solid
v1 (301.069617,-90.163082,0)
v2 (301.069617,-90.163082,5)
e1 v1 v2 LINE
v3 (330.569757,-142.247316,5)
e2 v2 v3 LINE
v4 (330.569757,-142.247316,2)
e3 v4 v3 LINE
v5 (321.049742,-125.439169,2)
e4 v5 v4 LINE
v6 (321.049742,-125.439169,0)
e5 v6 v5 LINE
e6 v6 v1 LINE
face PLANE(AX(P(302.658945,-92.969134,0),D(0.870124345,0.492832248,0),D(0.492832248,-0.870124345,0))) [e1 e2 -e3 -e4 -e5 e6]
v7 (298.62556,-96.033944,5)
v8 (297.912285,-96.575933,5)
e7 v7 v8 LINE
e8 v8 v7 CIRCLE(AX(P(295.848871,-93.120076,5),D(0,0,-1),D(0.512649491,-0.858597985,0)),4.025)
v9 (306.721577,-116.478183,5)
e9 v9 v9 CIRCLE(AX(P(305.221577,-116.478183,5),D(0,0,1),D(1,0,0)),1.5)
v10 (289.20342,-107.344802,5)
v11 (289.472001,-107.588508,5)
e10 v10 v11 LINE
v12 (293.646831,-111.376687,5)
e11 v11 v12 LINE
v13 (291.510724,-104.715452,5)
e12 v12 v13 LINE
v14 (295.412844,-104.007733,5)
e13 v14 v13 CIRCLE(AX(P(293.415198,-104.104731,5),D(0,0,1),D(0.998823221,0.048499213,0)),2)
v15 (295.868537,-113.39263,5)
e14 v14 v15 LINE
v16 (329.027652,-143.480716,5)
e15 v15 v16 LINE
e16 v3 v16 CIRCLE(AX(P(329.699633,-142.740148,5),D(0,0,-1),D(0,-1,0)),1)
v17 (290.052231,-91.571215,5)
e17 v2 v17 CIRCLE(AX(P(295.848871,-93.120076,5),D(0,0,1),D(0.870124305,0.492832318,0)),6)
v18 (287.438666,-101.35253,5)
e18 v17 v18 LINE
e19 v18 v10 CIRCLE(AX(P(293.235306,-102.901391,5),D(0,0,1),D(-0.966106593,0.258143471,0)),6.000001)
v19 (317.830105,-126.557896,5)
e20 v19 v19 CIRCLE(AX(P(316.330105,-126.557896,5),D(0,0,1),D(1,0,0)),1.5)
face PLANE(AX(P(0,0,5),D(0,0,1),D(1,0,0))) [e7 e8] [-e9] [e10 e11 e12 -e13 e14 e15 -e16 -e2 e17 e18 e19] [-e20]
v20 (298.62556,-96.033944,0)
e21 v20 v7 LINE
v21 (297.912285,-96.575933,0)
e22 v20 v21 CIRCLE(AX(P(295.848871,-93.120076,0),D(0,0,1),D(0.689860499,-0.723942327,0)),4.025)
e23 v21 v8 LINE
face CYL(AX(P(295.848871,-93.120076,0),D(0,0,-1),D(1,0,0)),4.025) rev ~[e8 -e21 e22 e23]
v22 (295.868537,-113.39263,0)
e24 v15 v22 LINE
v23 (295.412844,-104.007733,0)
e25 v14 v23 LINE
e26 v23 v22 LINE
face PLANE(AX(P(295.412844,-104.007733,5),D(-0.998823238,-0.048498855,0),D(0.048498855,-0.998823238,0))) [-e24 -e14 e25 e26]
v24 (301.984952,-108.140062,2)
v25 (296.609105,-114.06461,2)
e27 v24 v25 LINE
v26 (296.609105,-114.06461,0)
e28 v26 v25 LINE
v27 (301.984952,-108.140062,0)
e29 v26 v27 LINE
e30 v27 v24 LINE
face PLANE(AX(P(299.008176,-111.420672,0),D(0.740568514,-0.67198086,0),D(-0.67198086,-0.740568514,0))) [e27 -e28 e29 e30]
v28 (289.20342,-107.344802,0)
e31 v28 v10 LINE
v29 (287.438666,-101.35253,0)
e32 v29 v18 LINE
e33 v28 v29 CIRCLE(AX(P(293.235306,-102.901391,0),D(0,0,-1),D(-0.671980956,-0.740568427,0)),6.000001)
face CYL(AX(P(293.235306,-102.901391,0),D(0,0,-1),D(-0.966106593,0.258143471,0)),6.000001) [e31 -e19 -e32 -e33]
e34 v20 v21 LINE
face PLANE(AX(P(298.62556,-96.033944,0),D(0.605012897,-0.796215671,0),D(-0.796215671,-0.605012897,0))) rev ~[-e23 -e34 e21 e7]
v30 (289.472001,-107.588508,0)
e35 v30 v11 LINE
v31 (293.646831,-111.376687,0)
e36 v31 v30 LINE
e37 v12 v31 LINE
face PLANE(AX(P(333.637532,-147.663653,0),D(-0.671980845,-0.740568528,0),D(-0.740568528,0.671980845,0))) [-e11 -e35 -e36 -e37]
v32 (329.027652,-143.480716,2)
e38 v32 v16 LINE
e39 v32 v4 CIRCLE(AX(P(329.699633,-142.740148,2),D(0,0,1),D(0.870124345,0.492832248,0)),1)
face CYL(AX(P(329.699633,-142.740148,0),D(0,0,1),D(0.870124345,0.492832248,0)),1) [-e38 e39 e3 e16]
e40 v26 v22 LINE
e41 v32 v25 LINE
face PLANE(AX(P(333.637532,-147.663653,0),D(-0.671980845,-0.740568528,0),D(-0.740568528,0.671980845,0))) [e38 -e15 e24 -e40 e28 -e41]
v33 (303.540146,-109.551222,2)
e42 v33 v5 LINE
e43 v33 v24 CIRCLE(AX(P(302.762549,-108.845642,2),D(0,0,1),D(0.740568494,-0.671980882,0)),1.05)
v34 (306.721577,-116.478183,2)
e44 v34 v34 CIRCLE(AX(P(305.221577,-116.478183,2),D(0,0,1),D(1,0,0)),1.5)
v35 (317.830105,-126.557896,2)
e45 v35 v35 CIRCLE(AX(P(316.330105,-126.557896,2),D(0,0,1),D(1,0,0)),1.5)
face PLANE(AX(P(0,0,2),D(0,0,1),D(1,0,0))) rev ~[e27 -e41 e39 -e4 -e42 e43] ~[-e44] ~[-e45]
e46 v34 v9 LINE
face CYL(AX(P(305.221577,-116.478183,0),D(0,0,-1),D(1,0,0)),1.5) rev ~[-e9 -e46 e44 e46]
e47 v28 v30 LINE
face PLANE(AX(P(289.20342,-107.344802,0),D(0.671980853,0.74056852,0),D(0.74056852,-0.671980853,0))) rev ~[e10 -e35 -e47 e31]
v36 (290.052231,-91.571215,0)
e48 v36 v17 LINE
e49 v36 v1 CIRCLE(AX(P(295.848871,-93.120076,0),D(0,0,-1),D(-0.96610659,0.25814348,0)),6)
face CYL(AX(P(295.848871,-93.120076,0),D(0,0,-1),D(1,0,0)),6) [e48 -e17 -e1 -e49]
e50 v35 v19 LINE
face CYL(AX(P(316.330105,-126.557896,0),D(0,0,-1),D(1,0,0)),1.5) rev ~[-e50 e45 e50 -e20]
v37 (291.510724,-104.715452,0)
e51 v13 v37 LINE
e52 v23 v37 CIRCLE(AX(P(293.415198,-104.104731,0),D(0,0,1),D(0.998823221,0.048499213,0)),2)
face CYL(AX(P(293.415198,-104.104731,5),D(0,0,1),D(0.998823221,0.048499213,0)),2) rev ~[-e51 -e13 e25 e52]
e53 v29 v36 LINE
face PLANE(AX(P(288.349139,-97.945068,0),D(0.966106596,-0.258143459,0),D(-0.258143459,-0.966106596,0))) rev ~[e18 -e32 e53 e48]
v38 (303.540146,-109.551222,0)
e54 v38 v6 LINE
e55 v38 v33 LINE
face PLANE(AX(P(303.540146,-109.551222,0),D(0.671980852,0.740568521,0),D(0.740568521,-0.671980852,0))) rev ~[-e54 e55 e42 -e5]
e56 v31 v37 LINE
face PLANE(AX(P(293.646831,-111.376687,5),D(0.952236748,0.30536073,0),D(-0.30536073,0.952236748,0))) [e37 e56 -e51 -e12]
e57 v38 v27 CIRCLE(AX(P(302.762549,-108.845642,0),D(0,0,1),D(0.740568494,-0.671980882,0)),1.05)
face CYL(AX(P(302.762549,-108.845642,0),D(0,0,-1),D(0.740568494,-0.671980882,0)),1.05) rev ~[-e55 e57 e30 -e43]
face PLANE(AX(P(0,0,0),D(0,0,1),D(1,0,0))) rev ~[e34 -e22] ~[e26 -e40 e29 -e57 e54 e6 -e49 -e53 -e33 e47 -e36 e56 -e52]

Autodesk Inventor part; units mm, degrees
ref_plane "YZ Plane" through (0, 0, 0) normal (1, 0, 0) x (0, 1, 0)
ref_plane "XZ Plane" through (0, 0, 0) normal (0, 1, 0) x (-1, 0, 0)
ref_plane "XY Plane" through (0, 0, 0) normal (0, 0, 1) x (1, 0, 0)
sketch "スケッチ1" plane through (0, 0, 0) normal (0, 0, 1) x (1, 0, 0)
  circle A0 centre (295.848871, -93.120076) radius 1.5
  circle A1 centre (295.848871, -93.120076) radius 3.025
  line L0 (302.911618, -92.777137) -> (291.344796, -101.566309)
  arc A2 (282.40584, -101.176779) -> (291.344796, -101.566309) centre (287.109706, -95.992799) ccw
  arc A3 (299.078829, -95.689522) -> (299.346701, -89.542385) centre (296.658778, -92.504659) ccw
  line L1 (214.413679, -12.475426) -> (302.911618, -92.777137)
  line L2 (186.870748, -14.489658) -> (289.472001, -107.588508)
  line L3 (89.513673, -53) -> (377.048162, -53)
  circle A4 centre (295.848871, -93.120076) radius 4.025
  circle A5 centre (295.848871, -93.120076) radius 6
  line L4 (290.052231, -91.571215) -> (285.593636, -108.257588)
  circle A6 centre (285.42622, -97.165857) radius 3.025
  arc A7 (287.438666, -101.35253) -> (289.20342, -107.344802) centre (293.235305, -102.901391) ccw
  circle A8 centre (298.015884, -108.589531) radius 3
  circle A9 centre (298.015884, -108.589531) radius 1.5
  line L5 (185.106531, 0.614305) -> (481.333939, -268.178035)
  line L6 (295.848871, -93.120076) -> (289.20342, -100.443813) construction
  line L7 (301.069617, -90.163082) -> (333.637532, -147.663653)
  line L8 (333.637532, -147.663653) -> (289.20342, -107.344802)
  circle A10 centre (295.848871, -93.120076) radius 1.5
  circle A11 centre (295.848871, -93.120076) radius 3.025
  line L9 (302.911618, -92.777137) -> (291.344796, -101.566309)
  arc A12 (282.40584, -101.176779) -> (291.344796, -101.566309) centre (287.109706, -95.992799) ccw
  arc A13 (299.078829, -95.689522) -> (299.346701, -89.542385) centre (296.658778, -92.504659) ccw
  line L10 (214.413679, -12.475426) -> (302.911618, -92.777137)
  line L11 (186.870748, -14.489658) -> (289.472001, -107.588508)
  line L12 (89.513673, -53) -> (377.048162, -53)
  circle A14 centre (295.848871, -93.120076) radius 4.025
  circle A15 centre (295.848871, -93.120076) radius 6
  line L13 (290.052231, -91.571215) -> (285.593636, -108.257588)
  circle A16 centre (285.42622, -97.165857) radius 3.025
  arc A17 (287.438666, -101.35253) -> (289.20342, -107.344802) centre (293.235305, -102.901391) ccw
  circle A18 centre (298.015884, -108.589531) radius 3 construction
  circle A19 centre (298.015884, -108.589531) radius 1.5
  line L14 (185.106531, 0.614305) -> (481.333939, -268.178035)
  line L15 (295.848871, -93.120076) -> (289.20342, -100.443813) construction
  line L16 (301.069617, -90.163082) -> (333.637532, -147.663653)
  line L17 (333.637532, -147.663653) -> (289.20342, -107.344802)
  line L18 (301.984952, -108.140062) -> (343.184474, -145.523895)
  circle A20 centre (305.221577, -116.478183) radius 1.5
  circle A21 centre (316.330105, -126.557896) radius 1.5
  line L19 (301.984952, -108.140062) -> (293.498432, -117.492783)
  arc A22 (303.540146, -109.551222) -> (301.984952, -108.140062) centre (302.762549, -108.845642) ccw
  line L20 (301.984952, -108.140062) -> (302.762549, -108.845642) construction
  line L21 (303.540146, -109.551222) -> (302.762549, -108.845642) construction
  point P0 (0, 0)
  point P1 (0, 0)
  point P2 (297.912288, -96.575931)
  point P3 (298.625557, -96.033946)
  point P4 (0, 0)
  point P5 (296.609105, -114.064611)
  point P6 (321.049741, -125.439168)
  dimension "d0" = 8.05
  dimension "d1" = 12
  dimension "d2" = 6
  dimension "d3" = 6
  dimension "d4" = 3
  dimension "d5" = 5
  dimension "d6" = 12
  dimension "d7" = 60
  dimension "d11" = 8.05
  dimension "d12" = 12
  dimension "d13" = 6
  dimension "d14" = 6
  dimension "d15" = 3
  dimension "d16" = 5
  dimension "d17" = 12
  dimension "d18" = 60
  dimension "d19" = 8
  dimension "d20" = 4
  dimension "d21" = 4
  dimension "d22" = 3
  dimension "d23" = 50
  dimension "d24" = 8
  dimension "d25" = 15
  dimension "d28" = 1.05
  dimension "d29" = 180
extrude "押し出し1" add sketch "スケッチ1" along normal blind 5 contours L7 L5 A5 L0 | L0 A5 L1 L7 | L1 A5 L7 | A5 L5 L0 A4 | L0 A3 L1 A5 | L7 L18 A22 L19 A8 L8 L2 A7 A2 L0 A5 L5 | L1 A5 | L0 A4 L5 A5 L1 A3 | A5 L0 L5 | L7 L8 L19 A8 L18 | A4 L0 | A5 L5 L0 | L0 A2 A7 L4 L5 A5 | L18 A22 | A5 L5 L4 | L19 A8 | A8 L19 | A9 picked at (298.233704, -96.341002)
fillet "フィレット1" radius 1 1 edges at (333.6375, -147.6637, 2.5)
extrude "押し出し2" cut sketch "スケッチ1" along normal blind 2 contours L7 L8 L19 A8 L18 | L18 A22 | L19 A8 picked at (299.870596, -110.60445)
sketch "スケッチ2" plane through (0, 0, 5) normal (0, 0, 1) x (1, 0, 0)
  arc A0 (329.027651, -143.480716) -> (330.569756, -142.247316) centre (329.699632, -142.740148) ccw
  line L0 (330.569756, -142.247316) -> (301.069617, -90.163082)
  arc A1 (301.069617, -90.163082) -> (290.052231, -91.571215) centre (295.848871, -93.120076) ccw
  line L1 (290.052231, -91.571215) -> (287.438666, -101.35253)
  arc A2 (287.438666, -101.35253) -> (289.20342, -107.344802) centre (293.235305, -102.901391) ccw
  line L2 (289.20342, -107.344802) -> (329.027651, -143.480716)
  arc A3 (298.625557, -96.033946) -> (297.912288, -96.575931) centre (295.848871, -93.120076) ccw
  line L3 (298.625557, -96.033946) -> (297.912288, -96.575931)
  circle A4 centre (316.330105, -126.557896) radius 1.5
  circle A5 centre (305.221577, -116.478183) radius 1.5
  line L4 (301.984952, -108.140062) -> (296.609105, -114.064611)
  line L5 (289.20342, -107.344802) -> (296.609105, -114.064611)
  line L6 (293.646831, -111.376687) -> (291.510724, -104.715452)
  line L7 (295.412844, -104.007733) -> (295.868537, -113.39263)
  arc A6 (295.412844, -104.007733) -> (291.510724, -104.715452) centre (293.415198, -104.104731) ccw
  point P0 (0, 0)
  point P1 (293.646831, -111.376687)
  dimension "d31" = 30
  dimension "d32" = 45
  dimension "d33" = 3
  dimension "d34" = 2
  dimension "d37" = 1
extrude "押し出し3" cut sketch "スケッチ2" against normal blind 10 contours L2 L6 A6 L7
equation "\"d20\" = 0.5 * d19"
equation "\"d21\" = d20"
properties part number "アーム先端" material "ポリカーボネート、スモーク"
